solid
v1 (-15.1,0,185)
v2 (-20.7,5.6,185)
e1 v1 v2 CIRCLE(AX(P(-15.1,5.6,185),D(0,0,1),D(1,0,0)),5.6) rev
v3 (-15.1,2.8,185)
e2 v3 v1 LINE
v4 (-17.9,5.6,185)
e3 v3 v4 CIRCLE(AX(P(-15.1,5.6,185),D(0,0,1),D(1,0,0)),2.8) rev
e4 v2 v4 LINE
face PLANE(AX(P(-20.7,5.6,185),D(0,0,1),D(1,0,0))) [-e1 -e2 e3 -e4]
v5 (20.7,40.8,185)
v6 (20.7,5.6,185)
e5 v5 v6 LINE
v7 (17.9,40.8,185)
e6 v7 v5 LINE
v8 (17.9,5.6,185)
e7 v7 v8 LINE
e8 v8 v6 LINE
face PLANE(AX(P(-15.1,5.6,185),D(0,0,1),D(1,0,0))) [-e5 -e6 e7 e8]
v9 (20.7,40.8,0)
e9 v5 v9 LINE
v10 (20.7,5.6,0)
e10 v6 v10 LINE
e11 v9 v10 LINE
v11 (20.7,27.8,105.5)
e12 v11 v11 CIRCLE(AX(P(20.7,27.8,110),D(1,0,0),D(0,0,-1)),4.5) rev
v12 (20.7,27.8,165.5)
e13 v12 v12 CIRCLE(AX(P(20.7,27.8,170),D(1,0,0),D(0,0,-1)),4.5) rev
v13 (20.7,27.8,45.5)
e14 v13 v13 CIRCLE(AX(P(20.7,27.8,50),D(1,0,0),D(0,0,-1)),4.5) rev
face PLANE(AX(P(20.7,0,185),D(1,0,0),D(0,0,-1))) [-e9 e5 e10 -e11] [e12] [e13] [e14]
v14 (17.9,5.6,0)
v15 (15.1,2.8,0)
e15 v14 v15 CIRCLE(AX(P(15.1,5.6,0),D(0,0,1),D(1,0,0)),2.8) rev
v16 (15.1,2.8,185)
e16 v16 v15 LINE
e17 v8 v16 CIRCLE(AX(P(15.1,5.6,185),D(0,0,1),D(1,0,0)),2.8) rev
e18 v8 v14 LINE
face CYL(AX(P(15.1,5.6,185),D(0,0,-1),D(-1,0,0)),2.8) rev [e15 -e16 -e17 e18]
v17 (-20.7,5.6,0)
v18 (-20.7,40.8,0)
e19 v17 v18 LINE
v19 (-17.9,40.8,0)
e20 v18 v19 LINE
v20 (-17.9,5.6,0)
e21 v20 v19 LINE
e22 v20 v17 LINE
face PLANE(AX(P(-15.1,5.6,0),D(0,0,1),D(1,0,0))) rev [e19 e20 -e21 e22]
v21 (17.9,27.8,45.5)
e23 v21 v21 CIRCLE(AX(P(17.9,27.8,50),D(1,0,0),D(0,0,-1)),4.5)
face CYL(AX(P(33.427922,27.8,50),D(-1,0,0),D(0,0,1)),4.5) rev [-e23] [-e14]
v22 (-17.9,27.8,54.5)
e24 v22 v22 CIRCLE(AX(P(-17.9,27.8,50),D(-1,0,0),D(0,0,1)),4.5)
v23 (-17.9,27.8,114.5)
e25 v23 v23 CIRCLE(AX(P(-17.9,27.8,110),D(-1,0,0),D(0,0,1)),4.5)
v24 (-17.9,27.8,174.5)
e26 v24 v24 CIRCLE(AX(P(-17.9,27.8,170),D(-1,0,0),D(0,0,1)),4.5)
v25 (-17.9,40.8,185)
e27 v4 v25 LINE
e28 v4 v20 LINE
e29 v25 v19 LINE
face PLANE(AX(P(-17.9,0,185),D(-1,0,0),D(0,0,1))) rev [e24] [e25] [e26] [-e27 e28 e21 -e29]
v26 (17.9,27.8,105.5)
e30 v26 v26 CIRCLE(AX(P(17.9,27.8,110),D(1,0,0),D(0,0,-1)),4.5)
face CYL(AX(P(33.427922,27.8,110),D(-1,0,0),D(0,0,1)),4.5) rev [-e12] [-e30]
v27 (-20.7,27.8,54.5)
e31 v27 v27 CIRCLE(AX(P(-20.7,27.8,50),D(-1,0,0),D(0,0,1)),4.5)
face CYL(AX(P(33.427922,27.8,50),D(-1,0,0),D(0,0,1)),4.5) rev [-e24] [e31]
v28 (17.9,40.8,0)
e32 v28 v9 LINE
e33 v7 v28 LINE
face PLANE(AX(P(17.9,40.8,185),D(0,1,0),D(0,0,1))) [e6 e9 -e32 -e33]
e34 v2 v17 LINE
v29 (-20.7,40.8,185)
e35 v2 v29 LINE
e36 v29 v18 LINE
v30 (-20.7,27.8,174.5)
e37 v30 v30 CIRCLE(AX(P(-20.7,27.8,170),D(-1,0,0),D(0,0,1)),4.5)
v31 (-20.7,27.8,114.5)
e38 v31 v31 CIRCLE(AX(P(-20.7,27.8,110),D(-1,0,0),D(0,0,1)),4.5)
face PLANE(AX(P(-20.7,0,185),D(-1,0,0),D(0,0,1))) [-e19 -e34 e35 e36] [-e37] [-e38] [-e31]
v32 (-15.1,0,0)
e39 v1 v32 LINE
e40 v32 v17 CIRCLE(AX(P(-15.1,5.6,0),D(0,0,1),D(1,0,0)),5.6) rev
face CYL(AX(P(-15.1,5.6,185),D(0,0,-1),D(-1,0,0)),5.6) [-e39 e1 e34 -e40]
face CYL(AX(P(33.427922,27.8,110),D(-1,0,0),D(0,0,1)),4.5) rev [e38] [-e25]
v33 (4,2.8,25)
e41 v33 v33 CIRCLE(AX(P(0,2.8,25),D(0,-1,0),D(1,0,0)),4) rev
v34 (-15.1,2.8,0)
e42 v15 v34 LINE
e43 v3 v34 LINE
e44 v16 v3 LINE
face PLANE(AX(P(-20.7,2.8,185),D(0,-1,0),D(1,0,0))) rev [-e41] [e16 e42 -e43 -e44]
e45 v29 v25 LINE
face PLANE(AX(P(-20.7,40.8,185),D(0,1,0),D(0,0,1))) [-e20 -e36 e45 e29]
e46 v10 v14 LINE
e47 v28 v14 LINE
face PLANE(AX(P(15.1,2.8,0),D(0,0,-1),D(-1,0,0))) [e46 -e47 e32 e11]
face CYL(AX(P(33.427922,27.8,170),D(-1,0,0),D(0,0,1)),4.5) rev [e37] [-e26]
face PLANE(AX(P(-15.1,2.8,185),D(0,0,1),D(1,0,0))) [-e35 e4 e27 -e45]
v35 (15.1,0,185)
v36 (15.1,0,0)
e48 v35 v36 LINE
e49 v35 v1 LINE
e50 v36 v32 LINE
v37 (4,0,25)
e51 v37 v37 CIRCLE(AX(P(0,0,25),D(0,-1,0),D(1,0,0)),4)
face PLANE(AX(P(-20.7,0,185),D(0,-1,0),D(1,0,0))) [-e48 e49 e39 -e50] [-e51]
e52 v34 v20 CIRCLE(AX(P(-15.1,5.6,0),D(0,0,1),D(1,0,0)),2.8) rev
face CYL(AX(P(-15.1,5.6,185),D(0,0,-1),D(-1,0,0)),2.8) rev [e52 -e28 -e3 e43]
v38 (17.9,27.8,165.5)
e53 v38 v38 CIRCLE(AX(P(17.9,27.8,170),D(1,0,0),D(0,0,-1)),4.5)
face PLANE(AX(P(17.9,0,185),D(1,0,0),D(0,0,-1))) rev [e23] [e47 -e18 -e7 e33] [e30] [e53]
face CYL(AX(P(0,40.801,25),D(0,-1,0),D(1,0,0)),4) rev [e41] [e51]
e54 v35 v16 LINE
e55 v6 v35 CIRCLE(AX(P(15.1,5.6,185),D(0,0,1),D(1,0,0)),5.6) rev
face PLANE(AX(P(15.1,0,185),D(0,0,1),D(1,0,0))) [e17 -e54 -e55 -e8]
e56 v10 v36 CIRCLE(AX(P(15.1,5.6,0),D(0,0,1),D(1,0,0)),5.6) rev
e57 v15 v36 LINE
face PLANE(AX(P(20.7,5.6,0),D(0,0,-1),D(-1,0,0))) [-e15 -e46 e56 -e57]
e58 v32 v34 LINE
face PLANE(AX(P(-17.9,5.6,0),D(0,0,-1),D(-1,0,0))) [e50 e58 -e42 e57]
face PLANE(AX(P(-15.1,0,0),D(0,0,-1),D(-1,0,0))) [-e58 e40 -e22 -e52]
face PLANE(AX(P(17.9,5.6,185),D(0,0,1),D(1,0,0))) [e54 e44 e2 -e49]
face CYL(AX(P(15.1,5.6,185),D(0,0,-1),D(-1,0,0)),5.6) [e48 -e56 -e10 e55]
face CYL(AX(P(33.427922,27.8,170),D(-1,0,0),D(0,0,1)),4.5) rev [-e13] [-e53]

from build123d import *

# Parameters (mm, degrees)
BASE_FLANGE1_DEPTH = 185
CUT_EXTRUDE1_REACH = 192.573
SKETCH11_R         = 4
CUT_EXTRUDE2_REACH = 195.916
SKETCH13_R         = 4.5


# Sheet-metal steps are written as plain solids
with BuildPart() as part:
    # Sketch1 → Base-Flange1 (new body)
    with BuildSketch(Plane.XY):
        with BuildLine():
            Line((-20.7, 40.8), (-20.7, 5.6))
            ThreePointArc((-20.7, 5.6), (-19.059797975, 1.640202025), (-15.1, 0))
            Line((-15.1, 0), (15.1, 0))
            ThreePointArc((15.1, 0), (19.059797975, 1.640202025), (20.7, 5.6))
            Line((20.7, 5.6), (20.7, 40.8))
            Line((20.7, 40.8), (17.9, 40.8))
            Line((17.9, 40.8), (17.9, 5.6))
            ThreePointArc((17.9, 5.6), (17.079898987, 3.620101013), (15.1, 2.8))
            Line((15.1, 2.8), (-15.1, 2.8))
            ThreePointArc((-15.1, 2.8), (-17.079898987, 3.620101013), (-17.9, 5.6))
            Line((-17.9, 5.6), (-17.9, 40.8))
            Line((-17.9, 40.8), (-20.7, 40.8))
        make_face()
    extrude(amount=BASE_FLANGE1_DEPTH)

    # Sketch11 → Cut-Extrude1 (cut, up to next)
    with BuildSketch(Plane.XZ, mode=Mode.PRIVATE) as cut_extrude1_sk1:
        with Locations((0, 25)):
            Circle(SKETCH11_R)
    cut_extrude1_tool1 = extrude(cut_extrude1_sk1.sketch, amount=-CUT_EXTRUDE1_REACH, mode=Mode.PRIVATE) & part.part
    add(cut_extrude1_tool1.solids().sort_by_distance((0, 0, 25))[0], mode=Mode.SUBTRACT)

    # Cut-Extrude2: up to this face of the body (flat: up to its plane)
    cut_extrude2_end = Plane(part.part.faces().sort_by_distance((20.7, 23.2, 92.5))[0])
    # Sketch13 → Cut-Extrude2 (cut, up to the picked face)
    with BuildSketch(Plane.ZY.offset(20.7), mode=Mode.PRIVATE) as cut_extrude2_sk1:
        with Locations(Location((50, 27.8, 0), (0, 0, 180))):
            Circle(SKETCH13_R)
    cut_extrude2_tool1 = split(extrude(cut_extrude2_sk1.sketch, amount=-CUT_EXTRUDE2_REACH, mode=Mode.PRIVATE), bisect_by=cut_extrude2_end, keep=Keep.BOTH, mode=Mode.PRIVATE)
    # Sketch13 → Cut-Extrude2 (cut, up to the picked face)
    with BuildSketch(Plane.ZY.offset(20.7), mode=Mode.PRIVATE) as cut_extrude2_sk2:
        with Locations(Location((110, 27.8, 0), (0, 0, 180))):
            Circle(SKETCH13_R)
    cut_extrude2_tool2 = split(extrude(cut_extrude2_sk2.sketch, amount=-CUT_EXTRUDE2_REACH, mode=Mode.PRIVATE), bisect_by=cut_extrude2_end, keep=Keep.BOTH, mode=Mode.PRIVATE)
    # Sketch13 → Cut-Extrude2 (cut, up to the picked face)
    with BuildSketch(Plane.ZY.offset(20.7), mode=Mode.PRIVATE) as cut_extrude2_sk3:
        with Locations(Location((170, 27.8, 0), (0, 0, 180))):
            Circle(SKETCH13_R)
    cut_extrude2_tool3 = split(extrude(cut_extrude2_sk3.sketch, amount=-CUT_EXTRUDE2_REACH, mode=Mode.PRIVATE), bisect_by=cut_extrude2_end, keep=Keep.BOTH, mode=Mode.PRIVATE)
    add(cut_extrude2_tool1.solids().sort_by(Axis((-20.7, 27.8, 50), (1, 0, 0)))[0], mode=Mode.SUBTRACT)
    add(cut_extrude2_tool2.solids().sort_by(Axis((-20.7, 27.8, 110), (1, 0, 0)))[0], mode=Mode.SUBTRACT)
    add(cut_extrude2_tool3.solids().sort_by(Axis((-20.7, 27.8, 170), (1, 0, 0)))[0], mode=Mode.SUBTRACT)


solid = part.part
